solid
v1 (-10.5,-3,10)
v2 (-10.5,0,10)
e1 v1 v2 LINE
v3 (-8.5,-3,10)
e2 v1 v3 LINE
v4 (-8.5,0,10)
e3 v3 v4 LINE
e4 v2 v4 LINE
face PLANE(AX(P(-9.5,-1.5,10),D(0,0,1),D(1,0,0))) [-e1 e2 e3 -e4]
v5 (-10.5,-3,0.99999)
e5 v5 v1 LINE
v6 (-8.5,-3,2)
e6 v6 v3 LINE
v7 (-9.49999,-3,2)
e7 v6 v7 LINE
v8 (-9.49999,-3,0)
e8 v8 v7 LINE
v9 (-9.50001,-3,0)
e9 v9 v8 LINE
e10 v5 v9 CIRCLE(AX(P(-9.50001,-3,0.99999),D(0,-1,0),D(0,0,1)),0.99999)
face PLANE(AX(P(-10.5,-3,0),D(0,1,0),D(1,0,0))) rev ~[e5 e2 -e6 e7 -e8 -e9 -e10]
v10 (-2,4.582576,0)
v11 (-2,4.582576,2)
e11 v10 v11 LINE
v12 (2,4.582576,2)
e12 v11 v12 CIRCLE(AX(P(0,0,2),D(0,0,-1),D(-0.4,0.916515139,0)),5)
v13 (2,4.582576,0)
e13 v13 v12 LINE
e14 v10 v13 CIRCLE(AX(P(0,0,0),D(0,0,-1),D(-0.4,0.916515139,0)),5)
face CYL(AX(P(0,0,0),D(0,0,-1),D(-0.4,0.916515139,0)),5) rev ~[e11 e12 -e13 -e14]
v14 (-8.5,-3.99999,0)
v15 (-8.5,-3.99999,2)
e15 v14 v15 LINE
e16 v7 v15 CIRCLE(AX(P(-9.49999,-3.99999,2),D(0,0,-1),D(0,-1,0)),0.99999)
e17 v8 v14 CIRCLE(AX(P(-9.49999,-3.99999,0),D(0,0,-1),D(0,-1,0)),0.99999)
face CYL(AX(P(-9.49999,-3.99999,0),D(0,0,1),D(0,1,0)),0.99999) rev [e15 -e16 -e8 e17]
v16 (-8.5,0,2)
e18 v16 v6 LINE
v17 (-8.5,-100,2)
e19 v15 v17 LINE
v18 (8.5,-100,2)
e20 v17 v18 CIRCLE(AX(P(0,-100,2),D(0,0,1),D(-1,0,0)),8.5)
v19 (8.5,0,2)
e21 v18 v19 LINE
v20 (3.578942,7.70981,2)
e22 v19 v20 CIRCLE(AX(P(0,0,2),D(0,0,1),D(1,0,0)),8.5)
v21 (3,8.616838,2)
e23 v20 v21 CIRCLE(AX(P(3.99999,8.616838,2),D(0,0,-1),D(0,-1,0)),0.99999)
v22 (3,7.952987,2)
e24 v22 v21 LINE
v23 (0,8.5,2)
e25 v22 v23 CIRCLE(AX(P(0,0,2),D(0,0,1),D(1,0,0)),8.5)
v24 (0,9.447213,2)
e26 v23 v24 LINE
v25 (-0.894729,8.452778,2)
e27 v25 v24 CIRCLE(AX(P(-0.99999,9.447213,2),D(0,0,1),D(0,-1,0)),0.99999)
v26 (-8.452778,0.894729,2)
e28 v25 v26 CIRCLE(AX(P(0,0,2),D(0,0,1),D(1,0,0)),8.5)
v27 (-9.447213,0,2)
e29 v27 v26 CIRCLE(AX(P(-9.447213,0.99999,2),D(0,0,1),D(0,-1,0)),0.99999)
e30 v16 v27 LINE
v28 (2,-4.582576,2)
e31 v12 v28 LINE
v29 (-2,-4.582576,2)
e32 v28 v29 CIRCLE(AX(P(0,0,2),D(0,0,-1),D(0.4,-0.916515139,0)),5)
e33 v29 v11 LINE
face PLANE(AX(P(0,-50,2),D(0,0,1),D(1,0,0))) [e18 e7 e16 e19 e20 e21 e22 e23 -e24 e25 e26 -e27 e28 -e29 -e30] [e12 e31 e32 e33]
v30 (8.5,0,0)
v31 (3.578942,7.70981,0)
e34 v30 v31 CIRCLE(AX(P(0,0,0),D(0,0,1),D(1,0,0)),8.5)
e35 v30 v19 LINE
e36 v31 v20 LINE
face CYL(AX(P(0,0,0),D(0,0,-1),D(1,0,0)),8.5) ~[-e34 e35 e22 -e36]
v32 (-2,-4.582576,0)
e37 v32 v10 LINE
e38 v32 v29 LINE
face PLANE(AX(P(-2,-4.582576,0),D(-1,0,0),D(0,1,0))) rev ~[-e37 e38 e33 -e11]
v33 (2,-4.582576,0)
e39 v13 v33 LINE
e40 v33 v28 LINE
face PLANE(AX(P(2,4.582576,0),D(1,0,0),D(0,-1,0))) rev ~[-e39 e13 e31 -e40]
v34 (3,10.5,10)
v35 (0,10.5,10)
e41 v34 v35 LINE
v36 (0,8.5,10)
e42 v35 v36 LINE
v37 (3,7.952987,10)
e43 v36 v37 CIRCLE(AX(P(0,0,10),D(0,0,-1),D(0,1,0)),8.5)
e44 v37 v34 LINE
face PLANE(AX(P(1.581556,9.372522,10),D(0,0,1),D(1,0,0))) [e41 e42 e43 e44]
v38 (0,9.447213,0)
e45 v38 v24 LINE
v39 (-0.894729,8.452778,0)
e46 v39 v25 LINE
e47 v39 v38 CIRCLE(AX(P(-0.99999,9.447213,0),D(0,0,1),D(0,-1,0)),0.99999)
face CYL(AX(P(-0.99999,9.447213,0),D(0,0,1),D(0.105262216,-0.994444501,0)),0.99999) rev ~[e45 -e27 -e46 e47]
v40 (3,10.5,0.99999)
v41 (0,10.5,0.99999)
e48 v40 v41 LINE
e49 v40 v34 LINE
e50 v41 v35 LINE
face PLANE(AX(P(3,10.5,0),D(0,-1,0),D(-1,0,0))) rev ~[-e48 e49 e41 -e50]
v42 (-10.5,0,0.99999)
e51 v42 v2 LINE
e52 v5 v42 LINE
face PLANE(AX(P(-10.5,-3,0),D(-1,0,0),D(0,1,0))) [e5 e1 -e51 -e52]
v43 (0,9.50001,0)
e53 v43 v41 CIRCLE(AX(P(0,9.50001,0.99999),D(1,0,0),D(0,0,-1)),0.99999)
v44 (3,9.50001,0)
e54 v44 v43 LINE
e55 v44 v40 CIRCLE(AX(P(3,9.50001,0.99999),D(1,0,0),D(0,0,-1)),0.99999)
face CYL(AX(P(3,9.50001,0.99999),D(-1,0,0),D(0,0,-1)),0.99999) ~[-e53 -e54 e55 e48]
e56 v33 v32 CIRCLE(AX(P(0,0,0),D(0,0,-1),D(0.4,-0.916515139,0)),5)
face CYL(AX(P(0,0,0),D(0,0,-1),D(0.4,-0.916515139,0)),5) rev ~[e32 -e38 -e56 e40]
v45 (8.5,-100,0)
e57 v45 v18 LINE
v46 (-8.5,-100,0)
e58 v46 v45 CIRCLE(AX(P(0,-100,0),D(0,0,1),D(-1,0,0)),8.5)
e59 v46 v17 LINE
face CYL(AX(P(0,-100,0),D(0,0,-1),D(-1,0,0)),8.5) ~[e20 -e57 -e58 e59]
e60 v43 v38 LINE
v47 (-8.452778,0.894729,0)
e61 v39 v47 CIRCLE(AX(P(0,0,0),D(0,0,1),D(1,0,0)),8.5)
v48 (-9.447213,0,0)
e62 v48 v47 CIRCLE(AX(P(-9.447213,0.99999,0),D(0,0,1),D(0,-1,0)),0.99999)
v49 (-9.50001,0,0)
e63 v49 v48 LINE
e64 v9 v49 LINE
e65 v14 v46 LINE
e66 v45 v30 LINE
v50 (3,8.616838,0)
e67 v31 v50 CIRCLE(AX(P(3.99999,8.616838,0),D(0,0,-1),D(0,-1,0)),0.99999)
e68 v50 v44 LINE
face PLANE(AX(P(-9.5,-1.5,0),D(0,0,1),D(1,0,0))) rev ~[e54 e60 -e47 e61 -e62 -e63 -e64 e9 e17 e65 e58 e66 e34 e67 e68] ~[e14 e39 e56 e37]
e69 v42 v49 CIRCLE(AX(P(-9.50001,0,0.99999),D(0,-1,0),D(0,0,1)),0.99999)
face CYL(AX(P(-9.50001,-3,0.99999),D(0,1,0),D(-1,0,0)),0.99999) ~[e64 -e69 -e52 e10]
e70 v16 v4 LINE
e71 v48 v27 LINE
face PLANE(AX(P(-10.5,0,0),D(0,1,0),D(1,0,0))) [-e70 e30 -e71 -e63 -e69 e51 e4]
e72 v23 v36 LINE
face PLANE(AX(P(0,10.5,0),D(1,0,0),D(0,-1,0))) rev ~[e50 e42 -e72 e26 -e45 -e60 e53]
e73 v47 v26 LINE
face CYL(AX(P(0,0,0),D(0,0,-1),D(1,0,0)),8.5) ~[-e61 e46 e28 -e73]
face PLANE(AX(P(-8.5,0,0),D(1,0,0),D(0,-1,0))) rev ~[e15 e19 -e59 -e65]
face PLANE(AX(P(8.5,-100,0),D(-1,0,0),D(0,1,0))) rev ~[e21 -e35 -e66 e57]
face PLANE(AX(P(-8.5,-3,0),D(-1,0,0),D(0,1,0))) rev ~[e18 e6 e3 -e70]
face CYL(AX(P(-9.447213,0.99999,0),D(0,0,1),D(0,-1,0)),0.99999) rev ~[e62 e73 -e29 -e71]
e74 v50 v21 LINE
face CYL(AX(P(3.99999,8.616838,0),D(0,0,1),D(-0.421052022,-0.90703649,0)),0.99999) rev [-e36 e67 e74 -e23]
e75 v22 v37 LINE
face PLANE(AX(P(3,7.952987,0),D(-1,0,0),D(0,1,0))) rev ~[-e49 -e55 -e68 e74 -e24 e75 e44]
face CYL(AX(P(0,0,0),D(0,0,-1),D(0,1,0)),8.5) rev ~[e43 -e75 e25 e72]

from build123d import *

# Parameters (mm, degrees)
F1_DEPTH = 2
F2_W     = 2
F2_H     = 3
F3_DEPTH = 10
F4_R     = 0.99999


# Not quite as in the source:
# - a fillet or chamfer is up to 0.001 mm smaller than in the source, because OpenCascade refuses the exact size


with BuildPart() as f1:
    # F0 (on Top) → F1 (new body)
    with BuildSketch(Plane.XY):
        with BuildLine():
            Line((8.5, -100), (8.5, 0))
            ThreePointArc((8.5, 0), (0, 8.5), (-8.5, 0))
            Line((-8.5, 0), (-8.5, -100))
            ThreePointArc((-8.5, -100), (0, -108.5), (8.5, -100))
        make_face()
        with BuildLine():
            ThreePointArc((-2, 4.582575695), (0, 5), (2, 4.582575695))
            Line((2, 4.582575695), (2, -4.582575695))
            ThreePointArc((2, -4.582575695), (0, -5), (-2, -4.582575695))
            Line((-2, -4.582575695), (-2, 4.582575695))
        make_face(mode=Mode.SUBTRACT)
    extrude(amount=F1_DEPTH)

    # F2 (on Top) → F3 (join)
    with BuildSketch(Plane.XY):
        with Locations((-9.5, -1.5)):
            Rectangle(F2_W, F2_H)
        with BuildLine():
            Line((0, 10.5), (0, 8.5))
            ThreePointArc((0, 8.5), (1.5247314005, 8.3621285661), (3, 7.9529868603))
            Line((3, 7.9529868603), (3, 10.5))
            Line((3, 10.5), (0, 10.5))
        make_face()
    extrude(amount=F3_DEPTH)

    # F4 (radius 1 in the source; OpenCascade refuses exactly that, so slightly less here)
    f4_edges = [f1.edges().sort_by_distance(p)[0] for p in [
        (-8.5, 0, 1),
        (0, 8.5, 1),
        (-8.5, -3, 1),
        (-10.5, -1.5, 0),
        (1.5, 10.5, 0),
        (3, 7.952987, 1),
    ]]
    fillet(f4_edges, radius=F4_R)


solid = f1.part
